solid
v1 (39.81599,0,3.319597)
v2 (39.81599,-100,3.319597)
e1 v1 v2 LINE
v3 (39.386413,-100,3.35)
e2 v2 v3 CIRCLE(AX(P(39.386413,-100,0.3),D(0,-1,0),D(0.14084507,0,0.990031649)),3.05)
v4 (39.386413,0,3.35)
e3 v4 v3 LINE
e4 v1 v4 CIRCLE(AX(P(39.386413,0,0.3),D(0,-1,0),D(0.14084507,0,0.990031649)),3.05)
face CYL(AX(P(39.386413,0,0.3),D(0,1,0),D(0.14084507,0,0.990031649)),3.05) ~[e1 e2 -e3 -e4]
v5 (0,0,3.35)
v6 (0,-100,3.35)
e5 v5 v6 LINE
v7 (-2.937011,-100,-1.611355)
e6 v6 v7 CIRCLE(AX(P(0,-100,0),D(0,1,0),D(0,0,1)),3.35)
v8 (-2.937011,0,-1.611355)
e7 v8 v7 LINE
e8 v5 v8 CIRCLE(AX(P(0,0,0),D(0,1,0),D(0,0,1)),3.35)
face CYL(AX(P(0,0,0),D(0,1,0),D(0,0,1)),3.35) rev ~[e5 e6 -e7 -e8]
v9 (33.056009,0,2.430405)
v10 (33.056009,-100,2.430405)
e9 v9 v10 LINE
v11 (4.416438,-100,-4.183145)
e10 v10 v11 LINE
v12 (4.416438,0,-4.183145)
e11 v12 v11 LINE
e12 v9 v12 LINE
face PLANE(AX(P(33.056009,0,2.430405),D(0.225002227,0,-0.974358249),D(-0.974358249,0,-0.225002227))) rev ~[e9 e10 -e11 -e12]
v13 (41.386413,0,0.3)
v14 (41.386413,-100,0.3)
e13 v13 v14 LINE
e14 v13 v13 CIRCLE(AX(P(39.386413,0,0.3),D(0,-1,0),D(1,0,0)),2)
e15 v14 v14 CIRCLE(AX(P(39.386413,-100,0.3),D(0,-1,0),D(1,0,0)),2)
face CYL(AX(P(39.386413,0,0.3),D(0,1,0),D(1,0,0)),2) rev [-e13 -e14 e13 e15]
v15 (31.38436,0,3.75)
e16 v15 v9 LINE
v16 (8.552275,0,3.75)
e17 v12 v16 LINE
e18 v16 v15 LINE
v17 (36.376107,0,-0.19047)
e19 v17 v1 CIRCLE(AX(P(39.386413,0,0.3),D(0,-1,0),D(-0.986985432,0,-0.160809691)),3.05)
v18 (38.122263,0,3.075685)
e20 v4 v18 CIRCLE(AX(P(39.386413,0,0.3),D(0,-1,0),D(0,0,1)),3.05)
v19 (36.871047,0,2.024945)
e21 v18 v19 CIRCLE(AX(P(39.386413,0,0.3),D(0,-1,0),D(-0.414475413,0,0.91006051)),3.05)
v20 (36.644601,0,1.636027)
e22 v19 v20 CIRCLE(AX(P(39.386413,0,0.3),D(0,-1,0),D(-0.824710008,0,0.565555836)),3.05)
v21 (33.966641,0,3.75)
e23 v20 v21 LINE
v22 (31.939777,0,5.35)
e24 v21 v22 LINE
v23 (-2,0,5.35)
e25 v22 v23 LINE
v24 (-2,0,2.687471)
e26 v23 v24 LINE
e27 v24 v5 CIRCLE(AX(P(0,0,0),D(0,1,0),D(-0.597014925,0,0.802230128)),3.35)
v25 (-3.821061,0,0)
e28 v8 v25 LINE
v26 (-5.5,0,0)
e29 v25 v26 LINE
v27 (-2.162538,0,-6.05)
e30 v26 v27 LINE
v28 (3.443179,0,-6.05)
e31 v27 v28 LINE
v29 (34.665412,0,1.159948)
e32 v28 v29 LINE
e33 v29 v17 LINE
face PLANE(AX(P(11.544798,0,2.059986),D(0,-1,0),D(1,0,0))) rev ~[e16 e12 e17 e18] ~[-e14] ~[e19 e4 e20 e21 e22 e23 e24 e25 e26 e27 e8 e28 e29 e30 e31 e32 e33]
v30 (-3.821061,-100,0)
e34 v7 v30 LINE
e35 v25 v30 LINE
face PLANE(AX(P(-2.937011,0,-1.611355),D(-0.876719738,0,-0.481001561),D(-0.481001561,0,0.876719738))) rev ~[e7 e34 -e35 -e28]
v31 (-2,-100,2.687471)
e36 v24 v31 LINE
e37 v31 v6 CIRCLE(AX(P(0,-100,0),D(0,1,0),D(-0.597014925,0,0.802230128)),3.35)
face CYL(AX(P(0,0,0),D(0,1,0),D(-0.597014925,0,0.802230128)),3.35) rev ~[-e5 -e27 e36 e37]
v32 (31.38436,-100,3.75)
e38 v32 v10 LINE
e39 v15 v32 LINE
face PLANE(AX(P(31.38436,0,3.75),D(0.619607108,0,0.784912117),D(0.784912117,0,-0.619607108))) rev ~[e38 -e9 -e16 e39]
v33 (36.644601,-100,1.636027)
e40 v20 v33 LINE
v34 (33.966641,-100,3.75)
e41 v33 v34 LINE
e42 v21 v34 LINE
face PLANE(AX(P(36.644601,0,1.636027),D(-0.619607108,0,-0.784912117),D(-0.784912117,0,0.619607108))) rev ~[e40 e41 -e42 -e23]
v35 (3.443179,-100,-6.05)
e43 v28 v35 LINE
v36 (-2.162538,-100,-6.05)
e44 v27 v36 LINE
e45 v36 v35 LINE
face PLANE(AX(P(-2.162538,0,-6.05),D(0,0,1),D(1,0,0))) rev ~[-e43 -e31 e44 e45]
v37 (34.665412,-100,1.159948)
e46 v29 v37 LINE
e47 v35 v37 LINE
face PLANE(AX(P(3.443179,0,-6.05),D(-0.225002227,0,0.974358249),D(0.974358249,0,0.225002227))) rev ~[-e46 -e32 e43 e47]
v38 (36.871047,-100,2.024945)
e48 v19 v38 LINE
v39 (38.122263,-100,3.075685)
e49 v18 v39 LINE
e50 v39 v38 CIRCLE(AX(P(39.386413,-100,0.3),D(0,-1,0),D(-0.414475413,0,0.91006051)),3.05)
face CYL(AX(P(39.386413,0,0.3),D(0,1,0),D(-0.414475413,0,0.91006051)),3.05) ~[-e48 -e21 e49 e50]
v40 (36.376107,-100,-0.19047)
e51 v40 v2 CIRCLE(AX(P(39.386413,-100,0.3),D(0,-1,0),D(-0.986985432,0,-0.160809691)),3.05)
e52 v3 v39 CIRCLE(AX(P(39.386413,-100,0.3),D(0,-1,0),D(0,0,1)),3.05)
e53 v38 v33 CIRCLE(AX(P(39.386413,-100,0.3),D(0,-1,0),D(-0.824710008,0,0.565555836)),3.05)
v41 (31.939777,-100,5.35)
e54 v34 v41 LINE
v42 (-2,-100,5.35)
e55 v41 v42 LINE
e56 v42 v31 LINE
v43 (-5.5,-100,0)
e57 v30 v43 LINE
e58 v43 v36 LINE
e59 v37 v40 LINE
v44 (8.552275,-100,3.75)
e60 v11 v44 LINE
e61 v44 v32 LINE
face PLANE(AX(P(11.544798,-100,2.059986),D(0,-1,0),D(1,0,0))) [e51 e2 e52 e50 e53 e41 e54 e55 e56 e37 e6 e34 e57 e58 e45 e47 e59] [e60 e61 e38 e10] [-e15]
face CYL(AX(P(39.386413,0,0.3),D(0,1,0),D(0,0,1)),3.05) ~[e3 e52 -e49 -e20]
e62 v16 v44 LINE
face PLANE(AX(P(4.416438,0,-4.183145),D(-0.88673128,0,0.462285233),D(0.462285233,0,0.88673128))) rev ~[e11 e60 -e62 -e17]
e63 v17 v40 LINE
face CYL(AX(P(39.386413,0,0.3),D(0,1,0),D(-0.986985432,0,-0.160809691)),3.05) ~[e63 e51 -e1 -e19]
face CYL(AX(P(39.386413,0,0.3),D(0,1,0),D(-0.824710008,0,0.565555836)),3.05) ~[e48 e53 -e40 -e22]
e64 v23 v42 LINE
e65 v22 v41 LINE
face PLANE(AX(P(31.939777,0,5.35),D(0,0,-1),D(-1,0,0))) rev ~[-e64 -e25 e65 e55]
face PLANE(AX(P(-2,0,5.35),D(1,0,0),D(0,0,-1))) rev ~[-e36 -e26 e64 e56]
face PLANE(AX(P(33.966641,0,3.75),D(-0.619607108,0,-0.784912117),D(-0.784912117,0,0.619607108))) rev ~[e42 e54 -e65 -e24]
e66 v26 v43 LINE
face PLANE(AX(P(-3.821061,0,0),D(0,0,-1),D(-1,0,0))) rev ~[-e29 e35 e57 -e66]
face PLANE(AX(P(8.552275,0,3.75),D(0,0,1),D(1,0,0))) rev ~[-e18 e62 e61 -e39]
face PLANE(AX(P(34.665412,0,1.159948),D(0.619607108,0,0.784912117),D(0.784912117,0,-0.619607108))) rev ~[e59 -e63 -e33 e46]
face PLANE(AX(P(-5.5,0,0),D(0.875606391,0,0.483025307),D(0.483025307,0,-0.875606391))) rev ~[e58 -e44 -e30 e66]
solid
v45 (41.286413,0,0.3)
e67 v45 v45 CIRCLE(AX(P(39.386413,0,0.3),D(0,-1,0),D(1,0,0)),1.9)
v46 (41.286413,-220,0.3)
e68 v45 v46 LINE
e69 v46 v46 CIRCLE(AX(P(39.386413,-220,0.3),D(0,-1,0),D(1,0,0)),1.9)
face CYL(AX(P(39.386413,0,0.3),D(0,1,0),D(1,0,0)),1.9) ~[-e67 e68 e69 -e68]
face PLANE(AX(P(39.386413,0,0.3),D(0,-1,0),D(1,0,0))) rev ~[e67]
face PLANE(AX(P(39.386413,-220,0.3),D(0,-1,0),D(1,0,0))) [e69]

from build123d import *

# Parameters (mm, degrees)
F0_R     = 2
F1_DEPTH = 100
F0_R_2   = 1.9
F2_DEPTH = 220


# Not quite as in the source:
# - a feature names something its author has since deleted; it is built from what else it names


with BuildPart() as f1:
    # F0 (on Front) → F1 (new body)
    with BuildSketch(Plane.XZ):
        with BuildLine():
            Line((31.3843597952, 3.75), (33.9666413399, 3.75))
            Line((33.9666413399, 3.75), (31.9397772655, 5.35))
            Line((31.9397772655, 5.35), (9.3864129766, 5.35))
            Line((9.3864129766, 5.35), (0, 5.35))
            Line((0, 5.35), (0, 3.35))
            ThreePointArc((0, 3.35), (2.8827538929, -1.7065257082), (-2.9370111217, -1.6113552281))
            Line((-2.9370111217, -1.6113552281), (-3.8210614584, 0))
            Line((-3.8210614584, 0), (-5.5, 0))
            Line((-5.5, 0), (-2.1625379435, -6.05))
            Line((-2.1625379435, -6.05), (3.4431787948, -6.05))
            Line((3.4431787948, -6.05), (4.4164381013, -4.1831450595))
            Line((4.4164381013, -4.1831450595), (8.5522748458, 3.75))
            Line((8.5522748458, 3.75), (31.3843597952, 3.75))
        make_face()
        with BuildLine():
            ThreePointArc((36.3761074084, -0.1904695569), (36.368841785, 0.7435810003), (36.6446012215, 1.6360270579))
            Line((36.6446012215, 1.6360270579), (33.9666413399, 3.75))
            Line((33.9666413399, 3.75), (31.3843597952, 3.75))
            Line((31.3843597952, 3.75), (33.0560092942, 2.4304052467))
            Line((33.0560092942, 2.4304052467), (34.6654122242, 1.1599477351))
            Line((34.6654122242, 1.1599477351), (36.3761074084, -0.1904695569))
        make_face()
        with BuildLine():
            ThreePointArc((38.1222629657, 3.0756845552), (37.4249855205, 2.6356588652), (36.8710474529, 2.0249452984))
            ThreePointArc((36.8710474529, 2.0249452984), (36.7506412519, 1.8346685035), (36.6446012215, 1.6360270579))
            ThreePointArc((36.6446012215, 1.6360270579), (36.368841785, 0.7435810003), (36.3761074084, -0.1904695569))
            ThreePointArc((36.3761074084, -0.1904695569), (41.5647564685, -1.8347879593), (39.8159904414, 3.3195965296))
            ThreePointArc((39.8159904414, 3.3195965296), (39.6017389906, 3.3423896377), (39.3864129766, 3.35))
            ThreePointArc((39.3864129766, 3.35), (38.7396278087, 3.2806323065), (38.1222629657, 3.0756845552))
        make_face()
        with Locations((39.3864129766, 0.3)):
            Circle(F0_R, mode=Mode.SUBTRACT)
        Polygon((3.4431787948, -6.05), (34.6654122242, 1.1599477351), (33.0560092942, 2.4304052467), (4.4164381013, -4.1831450595), align=None)
        with BuildLine():
            Line((0, 3.35), (0, 5.35))
            Line((0, 5.35), (-2, 5.35))
            Line((-2, 5.35), (-2, 2.6874709301))
            ThreePointArc((-2, 2.6874709301), (-1.0534401702, 3.180057202), (0, 3.35))
        make_face()
    extrude(amount=F1_DEPTH)


with BuildPart() as f2:
    # F0 (on Front) → F2 (new body)
    with BuildSketch(Plane.XZ):
        with Locations((39.3864129766, 0.3)):
            Circle(F0_R_2)
    extrude(amount=F2_DEPTH)


solid = Compound([f1.part, f2.part])
